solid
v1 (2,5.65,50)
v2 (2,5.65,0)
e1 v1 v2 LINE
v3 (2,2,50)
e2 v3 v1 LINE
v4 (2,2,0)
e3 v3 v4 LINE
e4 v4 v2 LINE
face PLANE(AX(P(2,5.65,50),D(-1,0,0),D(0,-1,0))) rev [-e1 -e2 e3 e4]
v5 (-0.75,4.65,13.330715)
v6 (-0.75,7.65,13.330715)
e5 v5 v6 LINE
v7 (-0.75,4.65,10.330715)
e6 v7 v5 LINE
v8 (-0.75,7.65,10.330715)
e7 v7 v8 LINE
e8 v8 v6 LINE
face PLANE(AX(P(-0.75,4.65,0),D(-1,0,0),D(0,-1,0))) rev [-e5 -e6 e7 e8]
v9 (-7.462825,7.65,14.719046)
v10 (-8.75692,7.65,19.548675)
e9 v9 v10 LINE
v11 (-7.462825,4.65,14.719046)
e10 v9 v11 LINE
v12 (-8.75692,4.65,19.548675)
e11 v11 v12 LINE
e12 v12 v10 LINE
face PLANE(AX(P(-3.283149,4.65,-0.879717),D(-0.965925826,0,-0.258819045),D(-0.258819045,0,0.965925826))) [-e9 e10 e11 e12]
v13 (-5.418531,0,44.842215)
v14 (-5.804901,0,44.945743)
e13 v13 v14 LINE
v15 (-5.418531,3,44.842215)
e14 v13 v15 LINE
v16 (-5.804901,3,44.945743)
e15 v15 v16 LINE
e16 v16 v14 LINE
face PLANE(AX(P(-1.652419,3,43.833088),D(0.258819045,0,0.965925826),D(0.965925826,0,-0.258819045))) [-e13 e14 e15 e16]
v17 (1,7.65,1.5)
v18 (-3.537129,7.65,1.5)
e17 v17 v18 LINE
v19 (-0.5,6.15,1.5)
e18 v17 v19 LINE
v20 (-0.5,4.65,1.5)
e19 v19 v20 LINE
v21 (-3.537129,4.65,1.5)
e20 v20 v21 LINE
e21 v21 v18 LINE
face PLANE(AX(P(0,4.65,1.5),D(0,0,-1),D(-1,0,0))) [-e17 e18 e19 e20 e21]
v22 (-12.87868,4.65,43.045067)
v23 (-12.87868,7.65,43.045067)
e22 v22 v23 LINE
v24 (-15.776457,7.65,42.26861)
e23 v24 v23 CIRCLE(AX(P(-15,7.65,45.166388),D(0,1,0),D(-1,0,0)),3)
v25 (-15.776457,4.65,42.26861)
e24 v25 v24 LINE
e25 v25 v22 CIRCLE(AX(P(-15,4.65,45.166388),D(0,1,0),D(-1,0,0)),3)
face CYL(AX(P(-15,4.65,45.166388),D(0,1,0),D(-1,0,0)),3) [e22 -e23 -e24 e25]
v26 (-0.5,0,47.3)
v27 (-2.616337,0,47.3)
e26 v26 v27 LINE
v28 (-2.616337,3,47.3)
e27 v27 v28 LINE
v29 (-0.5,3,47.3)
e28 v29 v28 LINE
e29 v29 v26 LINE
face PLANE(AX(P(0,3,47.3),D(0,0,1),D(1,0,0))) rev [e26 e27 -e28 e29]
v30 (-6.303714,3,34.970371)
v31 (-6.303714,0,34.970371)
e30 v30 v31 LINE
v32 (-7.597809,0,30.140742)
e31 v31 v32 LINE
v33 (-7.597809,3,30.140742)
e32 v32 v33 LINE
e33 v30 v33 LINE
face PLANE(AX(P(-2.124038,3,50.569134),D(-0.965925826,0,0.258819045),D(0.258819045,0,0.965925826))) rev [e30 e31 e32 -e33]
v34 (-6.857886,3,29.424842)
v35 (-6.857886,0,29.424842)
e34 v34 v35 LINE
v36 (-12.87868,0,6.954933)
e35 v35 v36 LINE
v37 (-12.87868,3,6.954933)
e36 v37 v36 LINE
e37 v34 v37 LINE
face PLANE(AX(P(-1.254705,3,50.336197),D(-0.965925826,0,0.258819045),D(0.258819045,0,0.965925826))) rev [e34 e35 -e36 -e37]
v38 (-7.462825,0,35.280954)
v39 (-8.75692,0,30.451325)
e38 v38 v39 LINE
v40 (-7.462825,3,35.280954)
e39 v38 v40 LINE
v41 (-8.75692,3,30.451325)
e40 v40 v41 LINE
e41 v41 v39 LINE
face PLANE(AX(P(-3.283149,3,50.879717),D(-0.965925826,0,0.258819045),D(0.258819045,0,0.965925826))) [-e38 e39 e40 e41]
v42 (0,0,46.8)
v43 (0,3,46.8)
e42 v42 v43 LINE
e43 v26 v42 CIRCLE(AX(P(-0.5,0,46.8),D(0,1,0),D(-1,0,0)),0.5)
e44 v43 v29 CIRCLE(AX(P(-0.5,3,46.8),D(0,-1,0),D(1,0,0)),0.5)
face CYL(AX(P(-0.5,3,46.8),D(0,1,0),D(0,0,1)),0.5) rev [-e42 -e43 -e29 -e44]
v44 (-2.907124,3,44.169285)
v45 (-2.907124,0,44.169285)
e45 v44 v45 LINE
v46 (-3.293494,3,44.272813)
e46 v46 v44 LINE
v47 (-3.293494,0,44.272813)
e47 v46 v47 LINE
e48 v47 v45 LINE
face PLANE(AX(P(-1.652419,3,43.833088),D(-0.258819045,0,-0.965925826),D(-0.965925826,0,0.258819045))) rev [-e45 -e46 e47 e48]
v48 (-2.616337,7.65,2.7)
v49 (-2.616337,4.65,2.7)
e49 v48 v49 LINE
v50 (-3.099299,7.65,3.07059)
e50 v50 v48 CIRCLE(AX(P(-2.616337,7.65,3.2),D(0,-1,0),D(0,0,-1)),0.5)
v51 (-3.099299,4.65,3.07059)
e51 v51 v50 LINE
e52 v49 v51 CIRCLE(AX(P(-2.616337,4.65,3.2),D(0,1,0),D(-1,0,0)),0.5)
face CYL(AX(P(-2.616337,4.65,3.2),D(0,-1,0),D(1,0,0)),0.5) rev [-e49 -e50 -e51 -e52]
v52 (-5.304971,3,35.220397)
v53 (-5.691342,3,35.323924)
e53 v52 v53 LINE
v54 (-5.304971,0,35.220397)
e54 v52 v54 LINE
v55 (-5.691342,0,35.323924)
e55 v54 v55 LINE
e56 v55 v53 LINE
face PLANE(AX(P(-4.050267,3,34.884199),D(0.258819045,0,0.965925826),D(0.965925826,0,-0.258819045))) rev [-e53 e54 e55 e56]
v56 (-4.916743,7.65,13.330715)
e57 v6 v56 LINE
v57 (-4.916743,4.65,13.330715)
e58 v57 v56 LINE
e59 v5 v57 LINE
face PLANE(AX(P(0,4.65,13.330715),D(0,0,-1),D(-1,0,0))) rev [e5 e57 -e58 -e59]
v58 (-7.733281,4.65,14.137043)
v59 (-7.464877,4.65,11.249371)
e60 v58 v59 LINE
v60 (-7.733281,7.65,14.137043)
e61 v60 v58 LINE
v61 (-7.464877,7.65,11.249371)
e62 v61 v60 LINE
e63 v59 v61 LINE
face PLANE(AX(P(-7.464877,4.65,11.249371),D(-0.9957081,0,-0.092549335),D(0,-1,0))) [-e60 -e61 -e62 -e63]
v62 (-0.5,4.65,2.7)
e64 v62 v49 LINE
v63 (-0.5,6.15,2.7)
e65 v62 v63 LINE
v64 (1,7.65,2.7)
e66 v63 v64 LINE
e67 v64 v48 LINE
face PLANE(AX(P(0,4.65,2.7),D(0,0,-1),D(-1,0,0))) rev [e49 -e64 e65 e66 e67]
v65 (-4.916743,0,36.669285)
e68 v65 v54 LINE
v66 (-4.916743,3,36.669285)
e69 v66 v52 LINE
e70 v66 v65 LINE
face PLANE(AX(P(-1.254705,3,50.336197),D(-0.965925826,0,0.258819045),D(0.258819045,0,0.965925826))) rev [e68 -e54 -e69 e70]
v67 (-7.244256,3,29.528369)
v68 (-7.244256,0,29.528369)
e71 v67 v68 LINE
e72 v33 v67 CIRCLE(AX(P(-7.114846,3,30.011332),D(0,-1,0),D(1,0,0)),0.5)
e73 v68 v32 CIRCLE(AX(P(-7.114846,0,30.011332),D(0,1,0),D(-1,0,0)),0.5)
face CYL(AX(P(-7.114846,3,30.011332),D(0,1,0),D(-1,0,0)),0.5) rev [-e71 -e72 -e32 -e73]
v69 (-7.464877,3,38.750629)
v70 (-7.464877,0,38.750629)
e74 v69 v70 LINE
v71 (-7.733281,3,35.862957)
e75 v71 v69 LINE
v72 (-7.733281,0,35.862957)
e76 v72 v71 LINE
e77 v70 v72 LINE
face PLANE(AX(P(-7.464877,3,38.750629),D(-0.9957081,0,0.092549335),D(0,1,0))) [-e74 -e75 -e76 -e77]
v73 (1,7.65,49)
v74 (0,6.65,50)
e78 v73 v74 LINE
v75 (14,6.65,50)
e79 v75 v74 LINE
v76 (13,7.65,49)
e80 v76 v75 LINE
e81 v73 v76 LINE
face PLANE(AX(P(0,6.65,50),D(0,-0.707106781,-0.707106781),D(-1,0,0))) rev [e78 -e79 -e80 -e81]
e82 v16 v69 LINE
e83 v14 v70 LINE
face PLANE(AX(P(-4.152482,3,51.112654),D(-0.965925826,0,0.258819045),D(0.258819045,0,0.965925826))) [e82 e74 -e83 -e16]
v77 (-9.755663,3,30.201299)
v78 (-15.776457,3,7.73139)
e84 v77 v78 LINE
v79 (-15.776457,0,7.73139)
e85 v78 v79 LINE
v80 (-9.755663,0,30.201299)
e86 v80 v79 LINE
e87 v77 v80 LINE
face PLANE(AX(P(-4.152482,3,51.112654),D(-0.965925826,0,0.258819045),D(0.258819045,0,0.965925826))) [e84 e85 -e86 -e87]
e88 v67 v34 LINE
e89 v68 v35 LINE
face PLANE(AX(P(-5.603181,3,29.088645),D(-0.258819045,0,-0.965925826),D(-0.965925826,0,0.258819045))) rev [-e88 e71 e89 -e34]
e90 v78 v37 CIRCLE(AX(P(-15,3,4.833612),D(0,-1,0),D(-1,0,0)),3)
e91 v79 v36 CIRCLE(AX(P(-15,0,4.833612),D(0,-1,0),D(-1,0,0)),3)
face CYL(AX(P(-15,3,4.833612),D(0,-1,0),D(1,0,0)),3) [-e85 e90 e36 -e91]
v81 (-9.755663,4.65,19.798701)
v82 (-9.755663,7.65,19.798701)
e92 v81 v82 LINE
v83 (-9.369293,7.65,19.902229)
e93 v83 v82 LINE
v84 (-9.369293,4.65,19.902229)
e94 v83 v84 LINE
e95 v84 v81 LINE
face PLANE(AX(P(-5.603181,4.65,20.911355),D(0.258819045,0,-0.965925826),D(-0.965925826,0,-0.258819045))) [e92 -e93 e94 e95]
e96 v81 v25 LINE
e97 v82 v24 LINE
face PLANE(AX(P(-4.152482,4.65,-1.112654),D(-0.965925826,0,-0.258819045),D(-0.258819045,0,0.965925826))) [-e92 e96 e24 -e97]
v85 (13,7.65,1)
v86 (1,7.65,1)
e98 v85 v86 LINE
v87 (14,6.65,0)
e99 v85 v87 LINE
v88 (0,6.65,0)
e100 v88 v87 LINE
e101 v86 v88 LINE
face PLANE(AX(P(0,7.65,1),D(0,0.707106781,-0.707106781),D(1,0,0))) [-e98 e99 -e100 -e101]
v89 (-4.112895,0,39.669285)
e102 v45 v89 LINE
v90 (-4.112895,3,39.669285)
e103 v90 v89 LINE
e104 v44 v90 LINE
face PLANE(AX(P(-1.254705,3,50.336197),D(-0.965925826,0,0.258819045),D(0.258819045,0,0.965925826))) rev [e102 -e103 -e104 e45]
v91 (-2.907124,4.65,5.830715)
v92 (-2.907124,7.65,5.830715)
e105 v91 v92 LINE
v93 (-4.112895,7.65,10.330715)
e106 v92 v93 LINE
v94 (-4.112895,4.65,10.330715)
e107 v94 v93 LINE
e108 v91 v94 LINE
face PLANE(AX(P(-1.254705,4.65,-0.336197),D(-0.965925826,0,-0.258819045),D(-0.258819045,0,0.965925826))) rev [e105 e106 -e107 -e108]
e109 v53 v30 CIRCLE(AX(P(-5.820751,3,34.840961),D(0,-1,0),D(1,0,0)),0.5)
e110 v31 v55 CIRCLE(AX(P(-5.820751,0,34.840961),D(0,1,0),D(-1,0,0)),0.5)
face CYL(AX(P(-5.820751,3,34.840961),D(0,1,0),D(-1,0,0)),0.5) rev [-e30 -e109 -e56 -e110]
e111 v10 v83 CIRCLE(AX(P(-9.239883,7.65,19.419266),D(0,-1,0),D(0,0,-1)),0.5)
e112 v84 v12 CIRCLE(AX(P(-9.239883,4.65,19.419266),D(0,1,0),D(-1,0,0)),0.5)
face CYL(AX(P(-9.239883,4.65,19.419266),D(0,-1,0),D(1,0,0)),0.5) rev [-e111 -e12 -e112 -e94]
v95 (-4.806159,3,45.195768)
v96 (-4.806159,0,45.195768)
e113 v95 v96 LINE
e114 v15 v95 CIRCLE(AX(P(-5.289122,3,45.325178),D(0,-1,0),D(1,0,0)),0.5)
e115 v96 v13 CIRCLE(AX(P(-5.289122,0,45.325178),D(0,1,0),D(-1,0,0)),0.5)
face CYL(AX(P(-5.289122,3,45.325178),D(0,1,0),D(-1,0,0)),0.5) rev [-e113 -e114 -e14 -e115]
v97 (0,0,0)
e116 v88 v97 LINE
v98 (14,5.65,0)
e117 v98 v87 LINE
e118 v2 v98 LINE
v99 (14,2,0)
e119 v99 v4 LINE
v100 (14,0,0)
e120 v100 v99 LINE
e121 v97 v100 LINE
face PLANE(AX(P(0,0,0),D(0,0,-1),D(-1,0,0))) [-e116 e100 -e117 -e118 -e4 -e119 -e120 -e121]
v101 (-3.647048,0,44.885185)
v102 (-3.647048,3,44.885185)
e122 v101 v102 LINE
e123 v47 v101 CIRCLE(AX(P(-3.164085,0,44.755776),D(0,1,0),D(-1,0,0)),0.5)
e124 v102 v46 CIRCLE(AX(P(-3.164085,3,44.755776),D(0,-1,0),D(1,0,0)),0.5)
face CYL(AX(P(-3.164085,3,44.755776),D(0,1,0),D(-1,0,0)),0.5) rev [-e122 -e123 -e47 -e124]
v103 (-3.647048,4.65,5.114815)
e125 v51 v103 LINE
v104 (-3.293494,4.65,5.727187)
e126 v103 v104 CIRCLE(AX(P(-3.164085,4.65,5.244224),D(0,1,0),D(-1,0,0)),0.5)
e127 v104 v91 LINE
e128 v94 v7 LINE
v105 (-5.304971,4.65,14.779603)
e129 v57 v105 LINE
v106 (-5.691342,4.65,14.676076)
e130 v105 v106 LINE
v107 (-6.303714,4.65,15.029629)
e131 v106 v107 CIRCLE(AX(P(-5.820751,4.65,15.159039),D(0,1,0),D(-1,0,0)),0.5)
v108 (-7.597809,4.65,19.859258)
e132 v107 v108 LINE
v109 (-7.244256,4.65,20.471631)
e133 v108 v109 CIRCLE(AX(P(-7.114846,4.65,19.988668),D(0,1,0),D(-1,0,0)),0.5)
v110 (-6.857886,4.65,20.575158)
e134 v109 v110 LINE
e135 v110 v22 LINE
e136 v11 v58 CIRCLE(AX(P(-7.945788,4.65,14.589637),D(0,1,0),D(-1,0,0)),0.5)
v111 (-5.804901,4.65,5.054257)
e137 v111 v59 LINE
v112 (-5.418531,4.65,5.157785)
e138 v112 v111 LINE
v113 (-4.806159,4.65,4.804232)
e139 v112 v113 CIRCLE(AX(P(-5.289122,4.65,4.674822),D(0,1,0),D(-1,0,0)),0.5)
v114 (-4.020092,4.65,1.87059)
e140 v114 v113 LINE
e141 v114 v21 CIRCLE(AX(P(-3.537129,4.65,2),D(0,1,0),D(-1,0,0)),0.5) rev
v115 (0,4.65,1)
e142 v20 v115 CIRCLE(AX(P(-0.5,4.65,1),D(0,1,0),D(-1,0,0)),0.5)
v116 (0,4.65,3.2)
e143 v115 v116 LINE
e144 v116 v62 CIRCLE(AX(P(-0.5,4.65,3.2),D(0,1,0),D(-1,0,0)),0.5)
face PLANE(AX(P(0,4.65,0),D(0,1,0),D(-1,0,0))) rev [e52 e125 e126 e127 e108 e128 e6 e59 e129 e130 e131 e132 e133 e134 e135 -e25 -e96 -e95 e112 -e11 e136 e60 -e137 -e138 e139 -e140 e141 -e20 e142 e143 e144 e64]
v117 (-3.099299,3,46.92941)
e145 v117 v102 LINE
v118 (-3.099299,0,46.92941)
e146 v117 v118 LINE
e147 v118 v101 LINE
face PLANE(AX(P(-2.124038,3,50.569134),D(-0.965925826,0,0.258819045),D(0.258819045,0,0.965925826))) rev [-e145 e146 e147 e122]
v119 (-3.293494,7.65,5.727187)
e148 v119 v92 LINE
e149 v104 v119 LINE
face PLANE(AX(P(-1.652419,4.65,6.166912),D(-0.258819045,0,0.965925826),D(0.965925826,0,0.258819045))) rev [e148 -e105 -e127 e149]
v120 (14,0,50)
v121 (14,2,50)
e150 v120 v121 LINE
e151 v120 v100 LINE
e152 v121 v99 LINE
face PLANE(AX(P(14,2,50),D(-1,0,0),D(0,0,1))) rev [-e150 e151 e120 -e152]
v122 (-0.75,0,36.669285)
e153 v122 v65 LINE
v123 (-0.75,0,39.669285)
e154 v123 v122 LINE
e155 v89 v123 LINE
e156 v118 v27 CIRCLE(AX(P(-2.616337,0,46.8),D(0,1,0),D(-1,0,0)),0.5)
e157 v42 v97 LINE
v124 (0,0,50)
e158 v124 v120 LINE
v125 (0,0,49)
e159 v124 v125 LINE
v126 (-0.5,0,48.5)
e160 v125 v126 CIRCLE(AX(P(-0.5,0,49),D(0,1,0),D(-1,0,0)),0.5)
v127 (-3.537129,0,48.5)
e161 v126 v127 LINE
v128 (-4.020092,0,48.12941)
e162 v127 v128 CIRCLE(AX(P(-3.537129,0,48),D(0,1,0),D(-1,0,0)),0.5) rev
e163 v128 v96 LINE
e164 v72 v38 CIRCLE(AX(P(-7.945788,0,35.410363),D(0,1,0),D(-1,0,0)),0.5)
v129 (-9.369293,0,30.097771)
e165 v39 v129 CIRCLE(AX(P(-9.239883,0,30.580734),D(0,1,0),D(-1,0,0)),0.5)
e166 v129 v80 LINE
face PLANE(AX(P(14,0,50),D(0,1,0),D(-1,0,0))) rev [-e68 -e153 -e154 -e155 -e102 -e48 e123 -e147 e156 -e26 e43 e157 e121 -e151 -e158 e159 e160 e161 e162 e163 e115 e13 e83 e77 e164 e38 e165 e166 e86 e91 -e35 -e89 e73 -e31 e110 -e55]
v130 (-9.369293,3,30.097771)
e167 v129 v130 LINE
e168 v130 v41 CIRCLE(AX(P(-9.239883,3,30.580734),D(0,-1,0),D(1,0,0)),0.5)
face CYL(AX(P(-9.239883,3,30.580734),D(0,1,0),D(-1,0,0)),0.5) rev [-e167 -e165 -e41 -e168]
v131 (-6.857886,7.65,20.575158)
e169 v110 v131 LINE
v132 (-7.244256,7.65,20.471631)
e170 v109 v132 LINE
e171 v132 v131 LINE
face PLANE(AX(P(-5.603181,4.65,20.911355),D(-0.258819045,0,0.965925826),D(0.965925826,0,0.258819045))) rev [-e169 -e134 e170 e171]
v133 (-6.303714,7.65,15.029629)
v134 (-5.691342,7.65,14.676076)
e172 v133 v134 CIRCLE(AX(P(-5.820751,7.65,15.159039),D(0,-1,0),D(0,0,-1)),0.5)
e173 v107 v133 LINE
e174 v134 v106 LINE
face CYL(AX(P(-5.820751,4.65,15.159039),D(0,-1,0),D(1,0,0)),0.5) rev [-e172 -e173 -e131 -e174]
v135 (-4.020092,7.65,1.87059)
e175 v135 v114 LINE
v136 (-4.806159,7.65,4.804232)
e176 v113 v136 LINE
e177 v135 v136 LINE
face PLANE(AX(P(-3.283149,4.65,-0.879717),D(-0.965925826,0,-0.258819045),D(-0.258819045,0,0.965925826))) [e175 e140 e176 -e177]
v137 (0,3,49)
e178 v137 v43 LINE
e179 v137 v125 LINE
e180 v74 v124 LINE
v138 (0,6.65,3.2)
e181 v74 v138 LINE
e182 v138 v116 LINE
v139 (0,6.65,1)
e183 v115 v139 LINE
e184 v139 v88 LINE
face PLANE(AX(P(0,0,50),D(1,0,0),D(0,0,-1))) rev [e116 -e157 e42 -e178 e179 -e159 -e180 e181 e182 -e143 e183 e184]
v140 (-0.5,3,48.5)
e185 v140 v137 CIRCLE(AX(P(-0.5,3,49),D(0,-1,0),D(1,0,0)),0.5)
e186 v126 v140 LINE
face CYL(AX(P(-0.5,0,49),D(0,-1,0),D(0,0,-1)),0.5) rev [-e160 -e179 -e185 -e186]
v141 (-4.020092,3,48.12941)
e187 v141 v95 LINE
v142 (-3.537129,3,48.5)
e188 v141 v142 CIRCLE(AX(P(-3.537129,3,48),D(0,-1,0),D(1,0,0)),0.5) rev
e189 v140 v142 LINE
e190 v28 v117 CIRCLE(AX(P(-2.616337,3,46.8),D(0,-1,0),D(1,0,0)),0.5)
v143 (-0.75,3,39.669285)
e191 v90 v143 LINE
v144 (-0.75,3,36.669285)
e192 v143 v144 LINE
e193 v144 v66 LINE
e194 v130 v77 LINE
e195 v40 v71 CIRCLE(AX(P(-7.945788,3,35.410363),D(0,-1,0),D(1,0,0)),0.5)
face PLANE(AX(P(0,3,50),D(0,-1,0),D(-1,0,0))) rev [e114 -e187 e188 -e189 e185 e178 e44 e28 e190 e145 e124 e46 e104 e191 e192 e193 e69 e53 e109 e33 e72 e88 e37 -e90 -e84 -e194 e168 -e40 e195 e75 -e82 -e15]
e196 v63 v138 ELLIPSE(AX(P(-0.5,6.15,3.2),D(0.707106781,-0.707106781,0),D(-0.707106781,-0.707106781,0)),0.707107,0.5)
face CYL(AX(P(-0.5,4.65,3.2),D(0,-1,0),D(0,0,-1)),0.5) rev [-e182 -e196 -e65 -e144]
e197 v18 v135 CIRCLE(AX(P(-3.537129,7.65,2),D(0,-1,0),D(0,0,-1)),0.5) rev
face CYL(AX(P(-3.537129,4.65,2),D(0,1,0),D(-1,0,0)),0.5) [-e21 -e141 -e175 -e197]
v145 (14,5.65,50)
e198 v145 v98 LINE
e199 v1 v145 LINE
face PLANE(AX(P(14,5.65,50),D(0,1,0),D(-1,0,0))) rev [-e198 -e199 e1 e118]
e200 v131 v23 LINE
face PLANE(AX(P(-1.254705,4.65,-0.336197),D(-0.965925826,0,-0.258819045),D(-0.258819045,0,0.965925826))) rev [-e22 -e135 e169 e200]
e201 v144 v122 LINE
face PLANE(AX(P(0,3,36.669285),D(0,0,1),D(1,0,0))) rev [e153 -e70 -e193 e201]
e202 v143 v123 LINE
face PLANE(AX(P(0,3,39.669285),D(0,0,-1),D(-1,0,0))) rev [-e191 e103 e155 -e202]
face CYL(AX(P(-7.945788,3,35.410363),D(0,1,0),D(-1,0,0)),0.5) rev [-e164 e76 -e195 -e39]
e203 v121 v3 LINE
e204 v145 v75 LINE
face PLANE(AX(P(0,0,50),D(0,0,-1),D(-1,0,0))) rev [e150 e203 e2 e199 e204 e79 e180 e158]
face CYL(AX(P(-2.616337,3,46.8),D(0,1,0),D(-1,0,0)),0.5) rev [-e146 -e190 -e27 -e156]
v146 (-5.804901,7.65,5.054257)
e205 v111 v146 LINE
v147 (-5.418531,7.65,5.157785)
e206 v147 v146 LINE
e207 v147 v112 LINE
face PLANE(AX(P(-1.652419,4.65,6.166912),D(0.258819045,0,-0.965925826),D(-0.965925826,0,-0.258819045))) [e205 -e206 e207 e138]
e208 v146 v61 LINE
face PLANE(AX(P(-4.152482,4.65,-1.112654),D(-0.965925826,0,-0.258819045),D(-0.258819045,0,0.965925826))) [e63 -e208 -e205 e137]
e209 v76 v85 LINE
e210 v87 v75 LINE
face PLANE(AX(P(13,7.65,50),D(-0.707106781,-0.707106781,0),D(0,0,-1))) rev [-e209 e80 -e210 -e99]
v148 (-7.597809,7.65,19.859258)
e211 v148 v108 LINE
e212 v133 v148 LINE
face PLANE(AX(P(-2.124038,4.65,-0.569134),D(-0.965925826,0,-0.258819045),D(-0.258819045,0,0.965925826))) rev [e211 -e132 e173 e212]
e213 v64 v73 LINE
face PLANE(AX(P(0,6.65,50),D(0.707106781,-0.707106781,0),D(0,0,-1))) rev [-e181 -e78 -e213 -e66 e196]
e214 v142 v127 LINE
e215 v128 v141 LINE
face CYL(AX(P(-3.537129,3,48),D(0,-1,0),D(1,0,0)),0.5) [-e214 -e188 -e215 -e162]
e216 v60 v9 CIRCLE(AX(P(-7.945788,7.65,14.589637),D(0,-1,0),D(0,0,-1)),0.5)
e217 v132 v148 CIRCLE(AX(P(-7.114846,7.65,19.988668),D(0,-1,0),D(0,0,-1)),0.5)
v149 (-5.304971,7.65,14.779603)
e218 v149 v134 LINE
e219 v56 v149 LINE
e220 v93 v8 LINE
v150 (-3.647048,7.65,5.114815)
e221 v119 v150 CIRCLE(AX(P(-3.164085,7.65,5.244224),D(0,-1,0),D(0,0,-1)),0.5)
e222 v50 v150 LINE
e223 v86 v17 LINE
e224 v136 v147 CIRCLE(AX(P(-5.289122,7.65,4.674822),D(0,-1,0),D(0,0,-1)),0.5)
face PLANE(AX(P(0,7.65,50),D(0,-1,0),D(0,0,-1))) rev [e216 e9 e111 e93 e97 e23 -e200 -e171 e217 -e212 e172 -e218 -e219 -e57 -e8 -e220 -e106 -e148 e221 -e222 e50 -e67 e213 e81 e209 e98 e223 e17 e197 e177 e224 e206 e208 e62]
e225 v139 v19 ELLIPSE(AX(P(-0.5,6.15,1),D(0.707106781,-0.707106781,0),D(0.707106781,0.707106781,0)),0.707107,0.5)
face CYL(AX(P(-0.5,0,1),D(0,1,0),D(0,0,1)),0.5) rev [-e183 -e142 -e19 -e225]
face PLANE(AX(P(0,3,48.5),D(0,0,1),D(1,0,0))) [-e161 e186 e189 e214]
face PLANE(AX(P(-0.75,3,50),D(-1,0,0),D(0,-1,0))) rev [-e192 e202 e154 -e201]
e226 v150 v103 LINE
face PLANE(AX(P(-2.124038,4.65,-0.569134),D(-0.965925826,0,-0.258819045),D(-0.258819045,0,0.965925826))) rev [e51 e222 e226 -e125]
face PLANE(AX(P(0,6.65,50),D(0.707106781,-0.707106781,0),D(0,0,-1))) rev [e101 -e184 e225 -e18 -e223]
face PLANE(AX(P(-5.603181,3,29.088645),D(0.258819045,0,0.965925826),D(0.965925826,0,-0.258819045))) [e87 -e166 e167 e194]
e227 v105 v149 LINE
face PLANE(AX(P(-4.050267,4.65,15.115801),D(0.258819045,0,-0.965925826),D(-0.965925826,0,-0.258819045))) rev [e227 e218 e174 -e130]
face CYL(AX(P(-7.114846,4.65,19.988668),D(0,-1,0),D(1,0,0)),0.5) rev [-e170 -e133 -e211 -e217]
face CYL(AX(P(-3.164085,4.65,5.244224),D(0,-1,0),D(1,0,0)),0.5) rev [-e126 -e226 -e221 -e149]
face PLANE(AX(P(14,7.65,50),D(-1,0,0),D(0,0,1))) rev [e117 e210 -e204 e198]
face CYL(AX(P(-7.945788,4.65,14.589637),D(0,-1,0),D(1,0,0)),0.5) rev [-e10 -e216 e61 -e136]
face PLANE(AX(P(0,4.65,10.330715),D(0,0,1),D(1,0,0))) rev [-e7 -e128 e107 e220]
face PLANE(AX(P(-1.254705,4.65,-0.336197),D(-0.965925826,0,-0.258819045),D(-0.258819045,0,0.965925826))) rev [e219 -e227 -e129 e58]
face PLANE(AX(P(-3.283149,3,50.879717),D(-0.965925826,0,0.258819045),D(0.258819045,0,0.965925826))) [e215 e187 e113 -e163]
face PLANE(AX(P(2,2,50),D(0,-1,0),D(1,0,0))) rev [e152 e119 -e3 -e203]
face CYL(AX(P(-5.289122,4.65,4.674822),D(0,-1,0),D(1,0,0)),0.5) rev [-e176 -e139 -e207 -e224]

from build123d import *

# Parameters (mm, degrees)
BOSS_EXTRUDE1_DEPTH = 50
BOSS_EXTRUDE2_DEPTH = 3
CIRPATTERN1_COUNT   = 2
CHAMFER1_SIZE       = 1
FILLET1_R           = 0.5
CHAMFER2_START      = -1
CHAMFER2_DEPTH      = 10


with BuildPart() as part:
    # Sketch2 → Boss-Extrude1 (new body)
    with BuildSketch(Plane.XY):
        Polygon((0, 0), (0, 7.65), (14, 7.65), (14, 5.65), (2, 5.65), (2, 2), (14, 2), (14, 0), align=None)
    extrude(amount=BOSS_EXTRUDE1_DEPTH)

    # Sketch3 → Boss-Extrude2 (add)
    with BuildSketch(Plane(origin=(0, 7.65, 0), x_dir=(1, 0, 0), z_dir=(0, 1, 0))):
        with BuildLine():
            Line((0, -2.7), (0, -1.5))
            Line((0, -1.5), (-3.920792386, -1.5))
            Line((-3.920792386, -1.5), (-4.935568127, -5.287194625))
            Line((-4.935568127, -5.287194625), (-5.804901371, -5.054257484))
            Line((-5.804901371, -5.054257484), (-8.202748881, -14.003146224))
            Line((-8.202748881, -14.003146224), (-7.333415638, -14.236083364))
            Line((-7.333415638, -14.236083364), (-8.886329908, -20.031638322))
            Line((-8.886329908, -20.031638322), (-9.755663152, -19.798701181))
            Line((-9.755663152, -19.798701181), (-15.776457135, -42.268610229))
            ThreePointArc((-15.776457135, -42.268610229), (-15.776457135, -48.064165187), (-12.878679656, -43.045067364))
            Line((-12.878679656, -43.045067364), (-6.857885673, -20.575158317))
            Line((-6.857885673, -20.575158317), (-7.727218917, -20.342221176))
            Line((-7.727218917, -20.342221176), (-6.174304646, -14.546666218))
            Line((-6.174304646, -14.546666218), (-5.304971403, -14.779603359))
            Line((-5.304971403, -14.779603359), (-4.916742835, -13.330714619))
            Line((-4.916742835, -13.330714619), (-0.75, -13.330714619))
            Line((-0.75, -13.330714619), (-0.75, -10.330714619))
            Line((-0.75, -10.330714619), (-4.112895258, -10.330714619))
            Line((-4.112895258, -10.330714619), (-2.907123892, -5.830714619))
            Line((-2.907123892, -5.830714619), (-3.776457135, -5.597777479))
            Line((-3.776457135, -5.597777479), (-3, -2.7))
            Line((-3, -2.7), (0, -2.7))
        make_face()
    boss_extrude2 = extrude(amount=-BOSS_EXTRUDE2_DEPTH)

    # CirPattern1: Boss-Extrude2 ×2 about axis
    cirpattern1_axis = Axis((0, 3.825, 25), (1, 0, 0))
    for i in range(1, CIRPATTERN1_COUNT):
        add(boss_extrude2.rotate(cirpattern1_axis, i * 360 / CIRPATTERN1_COUNT))

    # Chamfer1
    chamfer1_edges = [part.edges().sort_by_distance(p)[0] for p in [
        (0, 7.65, 26.35),
        (14, 7.65, 25),
        (0, 7.65, 0.75),
        (7, 7.65, 50),
        (7, 7.65, 0),
    ]]
    chamfer(chamfer1_edges, length=CHAMFER1_SIZE)

    # Fillet1
    fillet1_edges = [part.edges().sort_by_distance(p)[0] for p in [
        (-8.886329908, 6.15, 20.031638322),
        (-7.333415638, 6.15, 14.236083364),
        (-4.935568127, 6.15, 5.287194625),
        (-3.920792386, 6.15, 1.5),
        (0, 5.65, 1.5),
        (0, 5.65, 2.7),
        (-3, 6.15, 2.7),
        (-3.776457135, 6.15, 5.597777479),
        (-6.174304646, 6.15, 14.546666218),
        (-7.727218917, 6.15, 20.342221176),
        (-8.886329908, 1.5, 29.968361678),
        (-7.333415638, 1.5, 35.763916636),
        (-4.935568127, 1.5, 44.712805375),
        (-3.920792386, 1.5, 48.5),
        (0, 1.5, 48.5),
        (0, 1.5, 47.3),
        (-3, 1.5, 47.3),
        (-3.776457135, 1.5, 44.402222521),
        (-6.174304646, 1.5, 35.453333782),
        (-7.727218917, 1.5, 29.657778824),
    ]]
    fillet(fillet1_edges, radius=FILLET1_R)

    # Chamfer2: read off the stored shape, not the designer's step
    # Chamfer2 outline → Chamfer2 (cut)
    with BuildSketch(Plane(origin=(0, 0, 0), x_dir=(1, 0, 0), z_dir=(0, 1, 0)).offset(CHAMFER2_START)):
        with BuildLine():
            Line((-7.464876997, -38.750629138), (-7.733281129, -35.862956659))
            ThreePointArc((-7.733281129, -35.862956659), (-7.7741568, -35.879982991), (-7.816378551, -35.893326158))
            Line((-7.816378551, -35.893326158), (-8.202748881, -35.996853776))
            Line((-8.202748881, -35.996853776), (-7.464876997, -38.750629138))
        make_face()
        with BuildLine():
            Line((-7.733281129, -14.137043341), (-7.464876997, -11.249370862))
            Line((-7.464876997, -11.249370862), (-8.202748881, -14.003146224))
            Line((-8.202748881, -14.003146224), (-7.816378551, -14.106673842))
            ThreePointArc((-7.816378551, -14.106673842), (-7.7741568, -14.120017009), (-7.733281129, -14.137043341))
        make_face()
    extrude(amount=CHAMFER2_DEPTH, mode=Mode.SUBTRACT)


solid = part.part
